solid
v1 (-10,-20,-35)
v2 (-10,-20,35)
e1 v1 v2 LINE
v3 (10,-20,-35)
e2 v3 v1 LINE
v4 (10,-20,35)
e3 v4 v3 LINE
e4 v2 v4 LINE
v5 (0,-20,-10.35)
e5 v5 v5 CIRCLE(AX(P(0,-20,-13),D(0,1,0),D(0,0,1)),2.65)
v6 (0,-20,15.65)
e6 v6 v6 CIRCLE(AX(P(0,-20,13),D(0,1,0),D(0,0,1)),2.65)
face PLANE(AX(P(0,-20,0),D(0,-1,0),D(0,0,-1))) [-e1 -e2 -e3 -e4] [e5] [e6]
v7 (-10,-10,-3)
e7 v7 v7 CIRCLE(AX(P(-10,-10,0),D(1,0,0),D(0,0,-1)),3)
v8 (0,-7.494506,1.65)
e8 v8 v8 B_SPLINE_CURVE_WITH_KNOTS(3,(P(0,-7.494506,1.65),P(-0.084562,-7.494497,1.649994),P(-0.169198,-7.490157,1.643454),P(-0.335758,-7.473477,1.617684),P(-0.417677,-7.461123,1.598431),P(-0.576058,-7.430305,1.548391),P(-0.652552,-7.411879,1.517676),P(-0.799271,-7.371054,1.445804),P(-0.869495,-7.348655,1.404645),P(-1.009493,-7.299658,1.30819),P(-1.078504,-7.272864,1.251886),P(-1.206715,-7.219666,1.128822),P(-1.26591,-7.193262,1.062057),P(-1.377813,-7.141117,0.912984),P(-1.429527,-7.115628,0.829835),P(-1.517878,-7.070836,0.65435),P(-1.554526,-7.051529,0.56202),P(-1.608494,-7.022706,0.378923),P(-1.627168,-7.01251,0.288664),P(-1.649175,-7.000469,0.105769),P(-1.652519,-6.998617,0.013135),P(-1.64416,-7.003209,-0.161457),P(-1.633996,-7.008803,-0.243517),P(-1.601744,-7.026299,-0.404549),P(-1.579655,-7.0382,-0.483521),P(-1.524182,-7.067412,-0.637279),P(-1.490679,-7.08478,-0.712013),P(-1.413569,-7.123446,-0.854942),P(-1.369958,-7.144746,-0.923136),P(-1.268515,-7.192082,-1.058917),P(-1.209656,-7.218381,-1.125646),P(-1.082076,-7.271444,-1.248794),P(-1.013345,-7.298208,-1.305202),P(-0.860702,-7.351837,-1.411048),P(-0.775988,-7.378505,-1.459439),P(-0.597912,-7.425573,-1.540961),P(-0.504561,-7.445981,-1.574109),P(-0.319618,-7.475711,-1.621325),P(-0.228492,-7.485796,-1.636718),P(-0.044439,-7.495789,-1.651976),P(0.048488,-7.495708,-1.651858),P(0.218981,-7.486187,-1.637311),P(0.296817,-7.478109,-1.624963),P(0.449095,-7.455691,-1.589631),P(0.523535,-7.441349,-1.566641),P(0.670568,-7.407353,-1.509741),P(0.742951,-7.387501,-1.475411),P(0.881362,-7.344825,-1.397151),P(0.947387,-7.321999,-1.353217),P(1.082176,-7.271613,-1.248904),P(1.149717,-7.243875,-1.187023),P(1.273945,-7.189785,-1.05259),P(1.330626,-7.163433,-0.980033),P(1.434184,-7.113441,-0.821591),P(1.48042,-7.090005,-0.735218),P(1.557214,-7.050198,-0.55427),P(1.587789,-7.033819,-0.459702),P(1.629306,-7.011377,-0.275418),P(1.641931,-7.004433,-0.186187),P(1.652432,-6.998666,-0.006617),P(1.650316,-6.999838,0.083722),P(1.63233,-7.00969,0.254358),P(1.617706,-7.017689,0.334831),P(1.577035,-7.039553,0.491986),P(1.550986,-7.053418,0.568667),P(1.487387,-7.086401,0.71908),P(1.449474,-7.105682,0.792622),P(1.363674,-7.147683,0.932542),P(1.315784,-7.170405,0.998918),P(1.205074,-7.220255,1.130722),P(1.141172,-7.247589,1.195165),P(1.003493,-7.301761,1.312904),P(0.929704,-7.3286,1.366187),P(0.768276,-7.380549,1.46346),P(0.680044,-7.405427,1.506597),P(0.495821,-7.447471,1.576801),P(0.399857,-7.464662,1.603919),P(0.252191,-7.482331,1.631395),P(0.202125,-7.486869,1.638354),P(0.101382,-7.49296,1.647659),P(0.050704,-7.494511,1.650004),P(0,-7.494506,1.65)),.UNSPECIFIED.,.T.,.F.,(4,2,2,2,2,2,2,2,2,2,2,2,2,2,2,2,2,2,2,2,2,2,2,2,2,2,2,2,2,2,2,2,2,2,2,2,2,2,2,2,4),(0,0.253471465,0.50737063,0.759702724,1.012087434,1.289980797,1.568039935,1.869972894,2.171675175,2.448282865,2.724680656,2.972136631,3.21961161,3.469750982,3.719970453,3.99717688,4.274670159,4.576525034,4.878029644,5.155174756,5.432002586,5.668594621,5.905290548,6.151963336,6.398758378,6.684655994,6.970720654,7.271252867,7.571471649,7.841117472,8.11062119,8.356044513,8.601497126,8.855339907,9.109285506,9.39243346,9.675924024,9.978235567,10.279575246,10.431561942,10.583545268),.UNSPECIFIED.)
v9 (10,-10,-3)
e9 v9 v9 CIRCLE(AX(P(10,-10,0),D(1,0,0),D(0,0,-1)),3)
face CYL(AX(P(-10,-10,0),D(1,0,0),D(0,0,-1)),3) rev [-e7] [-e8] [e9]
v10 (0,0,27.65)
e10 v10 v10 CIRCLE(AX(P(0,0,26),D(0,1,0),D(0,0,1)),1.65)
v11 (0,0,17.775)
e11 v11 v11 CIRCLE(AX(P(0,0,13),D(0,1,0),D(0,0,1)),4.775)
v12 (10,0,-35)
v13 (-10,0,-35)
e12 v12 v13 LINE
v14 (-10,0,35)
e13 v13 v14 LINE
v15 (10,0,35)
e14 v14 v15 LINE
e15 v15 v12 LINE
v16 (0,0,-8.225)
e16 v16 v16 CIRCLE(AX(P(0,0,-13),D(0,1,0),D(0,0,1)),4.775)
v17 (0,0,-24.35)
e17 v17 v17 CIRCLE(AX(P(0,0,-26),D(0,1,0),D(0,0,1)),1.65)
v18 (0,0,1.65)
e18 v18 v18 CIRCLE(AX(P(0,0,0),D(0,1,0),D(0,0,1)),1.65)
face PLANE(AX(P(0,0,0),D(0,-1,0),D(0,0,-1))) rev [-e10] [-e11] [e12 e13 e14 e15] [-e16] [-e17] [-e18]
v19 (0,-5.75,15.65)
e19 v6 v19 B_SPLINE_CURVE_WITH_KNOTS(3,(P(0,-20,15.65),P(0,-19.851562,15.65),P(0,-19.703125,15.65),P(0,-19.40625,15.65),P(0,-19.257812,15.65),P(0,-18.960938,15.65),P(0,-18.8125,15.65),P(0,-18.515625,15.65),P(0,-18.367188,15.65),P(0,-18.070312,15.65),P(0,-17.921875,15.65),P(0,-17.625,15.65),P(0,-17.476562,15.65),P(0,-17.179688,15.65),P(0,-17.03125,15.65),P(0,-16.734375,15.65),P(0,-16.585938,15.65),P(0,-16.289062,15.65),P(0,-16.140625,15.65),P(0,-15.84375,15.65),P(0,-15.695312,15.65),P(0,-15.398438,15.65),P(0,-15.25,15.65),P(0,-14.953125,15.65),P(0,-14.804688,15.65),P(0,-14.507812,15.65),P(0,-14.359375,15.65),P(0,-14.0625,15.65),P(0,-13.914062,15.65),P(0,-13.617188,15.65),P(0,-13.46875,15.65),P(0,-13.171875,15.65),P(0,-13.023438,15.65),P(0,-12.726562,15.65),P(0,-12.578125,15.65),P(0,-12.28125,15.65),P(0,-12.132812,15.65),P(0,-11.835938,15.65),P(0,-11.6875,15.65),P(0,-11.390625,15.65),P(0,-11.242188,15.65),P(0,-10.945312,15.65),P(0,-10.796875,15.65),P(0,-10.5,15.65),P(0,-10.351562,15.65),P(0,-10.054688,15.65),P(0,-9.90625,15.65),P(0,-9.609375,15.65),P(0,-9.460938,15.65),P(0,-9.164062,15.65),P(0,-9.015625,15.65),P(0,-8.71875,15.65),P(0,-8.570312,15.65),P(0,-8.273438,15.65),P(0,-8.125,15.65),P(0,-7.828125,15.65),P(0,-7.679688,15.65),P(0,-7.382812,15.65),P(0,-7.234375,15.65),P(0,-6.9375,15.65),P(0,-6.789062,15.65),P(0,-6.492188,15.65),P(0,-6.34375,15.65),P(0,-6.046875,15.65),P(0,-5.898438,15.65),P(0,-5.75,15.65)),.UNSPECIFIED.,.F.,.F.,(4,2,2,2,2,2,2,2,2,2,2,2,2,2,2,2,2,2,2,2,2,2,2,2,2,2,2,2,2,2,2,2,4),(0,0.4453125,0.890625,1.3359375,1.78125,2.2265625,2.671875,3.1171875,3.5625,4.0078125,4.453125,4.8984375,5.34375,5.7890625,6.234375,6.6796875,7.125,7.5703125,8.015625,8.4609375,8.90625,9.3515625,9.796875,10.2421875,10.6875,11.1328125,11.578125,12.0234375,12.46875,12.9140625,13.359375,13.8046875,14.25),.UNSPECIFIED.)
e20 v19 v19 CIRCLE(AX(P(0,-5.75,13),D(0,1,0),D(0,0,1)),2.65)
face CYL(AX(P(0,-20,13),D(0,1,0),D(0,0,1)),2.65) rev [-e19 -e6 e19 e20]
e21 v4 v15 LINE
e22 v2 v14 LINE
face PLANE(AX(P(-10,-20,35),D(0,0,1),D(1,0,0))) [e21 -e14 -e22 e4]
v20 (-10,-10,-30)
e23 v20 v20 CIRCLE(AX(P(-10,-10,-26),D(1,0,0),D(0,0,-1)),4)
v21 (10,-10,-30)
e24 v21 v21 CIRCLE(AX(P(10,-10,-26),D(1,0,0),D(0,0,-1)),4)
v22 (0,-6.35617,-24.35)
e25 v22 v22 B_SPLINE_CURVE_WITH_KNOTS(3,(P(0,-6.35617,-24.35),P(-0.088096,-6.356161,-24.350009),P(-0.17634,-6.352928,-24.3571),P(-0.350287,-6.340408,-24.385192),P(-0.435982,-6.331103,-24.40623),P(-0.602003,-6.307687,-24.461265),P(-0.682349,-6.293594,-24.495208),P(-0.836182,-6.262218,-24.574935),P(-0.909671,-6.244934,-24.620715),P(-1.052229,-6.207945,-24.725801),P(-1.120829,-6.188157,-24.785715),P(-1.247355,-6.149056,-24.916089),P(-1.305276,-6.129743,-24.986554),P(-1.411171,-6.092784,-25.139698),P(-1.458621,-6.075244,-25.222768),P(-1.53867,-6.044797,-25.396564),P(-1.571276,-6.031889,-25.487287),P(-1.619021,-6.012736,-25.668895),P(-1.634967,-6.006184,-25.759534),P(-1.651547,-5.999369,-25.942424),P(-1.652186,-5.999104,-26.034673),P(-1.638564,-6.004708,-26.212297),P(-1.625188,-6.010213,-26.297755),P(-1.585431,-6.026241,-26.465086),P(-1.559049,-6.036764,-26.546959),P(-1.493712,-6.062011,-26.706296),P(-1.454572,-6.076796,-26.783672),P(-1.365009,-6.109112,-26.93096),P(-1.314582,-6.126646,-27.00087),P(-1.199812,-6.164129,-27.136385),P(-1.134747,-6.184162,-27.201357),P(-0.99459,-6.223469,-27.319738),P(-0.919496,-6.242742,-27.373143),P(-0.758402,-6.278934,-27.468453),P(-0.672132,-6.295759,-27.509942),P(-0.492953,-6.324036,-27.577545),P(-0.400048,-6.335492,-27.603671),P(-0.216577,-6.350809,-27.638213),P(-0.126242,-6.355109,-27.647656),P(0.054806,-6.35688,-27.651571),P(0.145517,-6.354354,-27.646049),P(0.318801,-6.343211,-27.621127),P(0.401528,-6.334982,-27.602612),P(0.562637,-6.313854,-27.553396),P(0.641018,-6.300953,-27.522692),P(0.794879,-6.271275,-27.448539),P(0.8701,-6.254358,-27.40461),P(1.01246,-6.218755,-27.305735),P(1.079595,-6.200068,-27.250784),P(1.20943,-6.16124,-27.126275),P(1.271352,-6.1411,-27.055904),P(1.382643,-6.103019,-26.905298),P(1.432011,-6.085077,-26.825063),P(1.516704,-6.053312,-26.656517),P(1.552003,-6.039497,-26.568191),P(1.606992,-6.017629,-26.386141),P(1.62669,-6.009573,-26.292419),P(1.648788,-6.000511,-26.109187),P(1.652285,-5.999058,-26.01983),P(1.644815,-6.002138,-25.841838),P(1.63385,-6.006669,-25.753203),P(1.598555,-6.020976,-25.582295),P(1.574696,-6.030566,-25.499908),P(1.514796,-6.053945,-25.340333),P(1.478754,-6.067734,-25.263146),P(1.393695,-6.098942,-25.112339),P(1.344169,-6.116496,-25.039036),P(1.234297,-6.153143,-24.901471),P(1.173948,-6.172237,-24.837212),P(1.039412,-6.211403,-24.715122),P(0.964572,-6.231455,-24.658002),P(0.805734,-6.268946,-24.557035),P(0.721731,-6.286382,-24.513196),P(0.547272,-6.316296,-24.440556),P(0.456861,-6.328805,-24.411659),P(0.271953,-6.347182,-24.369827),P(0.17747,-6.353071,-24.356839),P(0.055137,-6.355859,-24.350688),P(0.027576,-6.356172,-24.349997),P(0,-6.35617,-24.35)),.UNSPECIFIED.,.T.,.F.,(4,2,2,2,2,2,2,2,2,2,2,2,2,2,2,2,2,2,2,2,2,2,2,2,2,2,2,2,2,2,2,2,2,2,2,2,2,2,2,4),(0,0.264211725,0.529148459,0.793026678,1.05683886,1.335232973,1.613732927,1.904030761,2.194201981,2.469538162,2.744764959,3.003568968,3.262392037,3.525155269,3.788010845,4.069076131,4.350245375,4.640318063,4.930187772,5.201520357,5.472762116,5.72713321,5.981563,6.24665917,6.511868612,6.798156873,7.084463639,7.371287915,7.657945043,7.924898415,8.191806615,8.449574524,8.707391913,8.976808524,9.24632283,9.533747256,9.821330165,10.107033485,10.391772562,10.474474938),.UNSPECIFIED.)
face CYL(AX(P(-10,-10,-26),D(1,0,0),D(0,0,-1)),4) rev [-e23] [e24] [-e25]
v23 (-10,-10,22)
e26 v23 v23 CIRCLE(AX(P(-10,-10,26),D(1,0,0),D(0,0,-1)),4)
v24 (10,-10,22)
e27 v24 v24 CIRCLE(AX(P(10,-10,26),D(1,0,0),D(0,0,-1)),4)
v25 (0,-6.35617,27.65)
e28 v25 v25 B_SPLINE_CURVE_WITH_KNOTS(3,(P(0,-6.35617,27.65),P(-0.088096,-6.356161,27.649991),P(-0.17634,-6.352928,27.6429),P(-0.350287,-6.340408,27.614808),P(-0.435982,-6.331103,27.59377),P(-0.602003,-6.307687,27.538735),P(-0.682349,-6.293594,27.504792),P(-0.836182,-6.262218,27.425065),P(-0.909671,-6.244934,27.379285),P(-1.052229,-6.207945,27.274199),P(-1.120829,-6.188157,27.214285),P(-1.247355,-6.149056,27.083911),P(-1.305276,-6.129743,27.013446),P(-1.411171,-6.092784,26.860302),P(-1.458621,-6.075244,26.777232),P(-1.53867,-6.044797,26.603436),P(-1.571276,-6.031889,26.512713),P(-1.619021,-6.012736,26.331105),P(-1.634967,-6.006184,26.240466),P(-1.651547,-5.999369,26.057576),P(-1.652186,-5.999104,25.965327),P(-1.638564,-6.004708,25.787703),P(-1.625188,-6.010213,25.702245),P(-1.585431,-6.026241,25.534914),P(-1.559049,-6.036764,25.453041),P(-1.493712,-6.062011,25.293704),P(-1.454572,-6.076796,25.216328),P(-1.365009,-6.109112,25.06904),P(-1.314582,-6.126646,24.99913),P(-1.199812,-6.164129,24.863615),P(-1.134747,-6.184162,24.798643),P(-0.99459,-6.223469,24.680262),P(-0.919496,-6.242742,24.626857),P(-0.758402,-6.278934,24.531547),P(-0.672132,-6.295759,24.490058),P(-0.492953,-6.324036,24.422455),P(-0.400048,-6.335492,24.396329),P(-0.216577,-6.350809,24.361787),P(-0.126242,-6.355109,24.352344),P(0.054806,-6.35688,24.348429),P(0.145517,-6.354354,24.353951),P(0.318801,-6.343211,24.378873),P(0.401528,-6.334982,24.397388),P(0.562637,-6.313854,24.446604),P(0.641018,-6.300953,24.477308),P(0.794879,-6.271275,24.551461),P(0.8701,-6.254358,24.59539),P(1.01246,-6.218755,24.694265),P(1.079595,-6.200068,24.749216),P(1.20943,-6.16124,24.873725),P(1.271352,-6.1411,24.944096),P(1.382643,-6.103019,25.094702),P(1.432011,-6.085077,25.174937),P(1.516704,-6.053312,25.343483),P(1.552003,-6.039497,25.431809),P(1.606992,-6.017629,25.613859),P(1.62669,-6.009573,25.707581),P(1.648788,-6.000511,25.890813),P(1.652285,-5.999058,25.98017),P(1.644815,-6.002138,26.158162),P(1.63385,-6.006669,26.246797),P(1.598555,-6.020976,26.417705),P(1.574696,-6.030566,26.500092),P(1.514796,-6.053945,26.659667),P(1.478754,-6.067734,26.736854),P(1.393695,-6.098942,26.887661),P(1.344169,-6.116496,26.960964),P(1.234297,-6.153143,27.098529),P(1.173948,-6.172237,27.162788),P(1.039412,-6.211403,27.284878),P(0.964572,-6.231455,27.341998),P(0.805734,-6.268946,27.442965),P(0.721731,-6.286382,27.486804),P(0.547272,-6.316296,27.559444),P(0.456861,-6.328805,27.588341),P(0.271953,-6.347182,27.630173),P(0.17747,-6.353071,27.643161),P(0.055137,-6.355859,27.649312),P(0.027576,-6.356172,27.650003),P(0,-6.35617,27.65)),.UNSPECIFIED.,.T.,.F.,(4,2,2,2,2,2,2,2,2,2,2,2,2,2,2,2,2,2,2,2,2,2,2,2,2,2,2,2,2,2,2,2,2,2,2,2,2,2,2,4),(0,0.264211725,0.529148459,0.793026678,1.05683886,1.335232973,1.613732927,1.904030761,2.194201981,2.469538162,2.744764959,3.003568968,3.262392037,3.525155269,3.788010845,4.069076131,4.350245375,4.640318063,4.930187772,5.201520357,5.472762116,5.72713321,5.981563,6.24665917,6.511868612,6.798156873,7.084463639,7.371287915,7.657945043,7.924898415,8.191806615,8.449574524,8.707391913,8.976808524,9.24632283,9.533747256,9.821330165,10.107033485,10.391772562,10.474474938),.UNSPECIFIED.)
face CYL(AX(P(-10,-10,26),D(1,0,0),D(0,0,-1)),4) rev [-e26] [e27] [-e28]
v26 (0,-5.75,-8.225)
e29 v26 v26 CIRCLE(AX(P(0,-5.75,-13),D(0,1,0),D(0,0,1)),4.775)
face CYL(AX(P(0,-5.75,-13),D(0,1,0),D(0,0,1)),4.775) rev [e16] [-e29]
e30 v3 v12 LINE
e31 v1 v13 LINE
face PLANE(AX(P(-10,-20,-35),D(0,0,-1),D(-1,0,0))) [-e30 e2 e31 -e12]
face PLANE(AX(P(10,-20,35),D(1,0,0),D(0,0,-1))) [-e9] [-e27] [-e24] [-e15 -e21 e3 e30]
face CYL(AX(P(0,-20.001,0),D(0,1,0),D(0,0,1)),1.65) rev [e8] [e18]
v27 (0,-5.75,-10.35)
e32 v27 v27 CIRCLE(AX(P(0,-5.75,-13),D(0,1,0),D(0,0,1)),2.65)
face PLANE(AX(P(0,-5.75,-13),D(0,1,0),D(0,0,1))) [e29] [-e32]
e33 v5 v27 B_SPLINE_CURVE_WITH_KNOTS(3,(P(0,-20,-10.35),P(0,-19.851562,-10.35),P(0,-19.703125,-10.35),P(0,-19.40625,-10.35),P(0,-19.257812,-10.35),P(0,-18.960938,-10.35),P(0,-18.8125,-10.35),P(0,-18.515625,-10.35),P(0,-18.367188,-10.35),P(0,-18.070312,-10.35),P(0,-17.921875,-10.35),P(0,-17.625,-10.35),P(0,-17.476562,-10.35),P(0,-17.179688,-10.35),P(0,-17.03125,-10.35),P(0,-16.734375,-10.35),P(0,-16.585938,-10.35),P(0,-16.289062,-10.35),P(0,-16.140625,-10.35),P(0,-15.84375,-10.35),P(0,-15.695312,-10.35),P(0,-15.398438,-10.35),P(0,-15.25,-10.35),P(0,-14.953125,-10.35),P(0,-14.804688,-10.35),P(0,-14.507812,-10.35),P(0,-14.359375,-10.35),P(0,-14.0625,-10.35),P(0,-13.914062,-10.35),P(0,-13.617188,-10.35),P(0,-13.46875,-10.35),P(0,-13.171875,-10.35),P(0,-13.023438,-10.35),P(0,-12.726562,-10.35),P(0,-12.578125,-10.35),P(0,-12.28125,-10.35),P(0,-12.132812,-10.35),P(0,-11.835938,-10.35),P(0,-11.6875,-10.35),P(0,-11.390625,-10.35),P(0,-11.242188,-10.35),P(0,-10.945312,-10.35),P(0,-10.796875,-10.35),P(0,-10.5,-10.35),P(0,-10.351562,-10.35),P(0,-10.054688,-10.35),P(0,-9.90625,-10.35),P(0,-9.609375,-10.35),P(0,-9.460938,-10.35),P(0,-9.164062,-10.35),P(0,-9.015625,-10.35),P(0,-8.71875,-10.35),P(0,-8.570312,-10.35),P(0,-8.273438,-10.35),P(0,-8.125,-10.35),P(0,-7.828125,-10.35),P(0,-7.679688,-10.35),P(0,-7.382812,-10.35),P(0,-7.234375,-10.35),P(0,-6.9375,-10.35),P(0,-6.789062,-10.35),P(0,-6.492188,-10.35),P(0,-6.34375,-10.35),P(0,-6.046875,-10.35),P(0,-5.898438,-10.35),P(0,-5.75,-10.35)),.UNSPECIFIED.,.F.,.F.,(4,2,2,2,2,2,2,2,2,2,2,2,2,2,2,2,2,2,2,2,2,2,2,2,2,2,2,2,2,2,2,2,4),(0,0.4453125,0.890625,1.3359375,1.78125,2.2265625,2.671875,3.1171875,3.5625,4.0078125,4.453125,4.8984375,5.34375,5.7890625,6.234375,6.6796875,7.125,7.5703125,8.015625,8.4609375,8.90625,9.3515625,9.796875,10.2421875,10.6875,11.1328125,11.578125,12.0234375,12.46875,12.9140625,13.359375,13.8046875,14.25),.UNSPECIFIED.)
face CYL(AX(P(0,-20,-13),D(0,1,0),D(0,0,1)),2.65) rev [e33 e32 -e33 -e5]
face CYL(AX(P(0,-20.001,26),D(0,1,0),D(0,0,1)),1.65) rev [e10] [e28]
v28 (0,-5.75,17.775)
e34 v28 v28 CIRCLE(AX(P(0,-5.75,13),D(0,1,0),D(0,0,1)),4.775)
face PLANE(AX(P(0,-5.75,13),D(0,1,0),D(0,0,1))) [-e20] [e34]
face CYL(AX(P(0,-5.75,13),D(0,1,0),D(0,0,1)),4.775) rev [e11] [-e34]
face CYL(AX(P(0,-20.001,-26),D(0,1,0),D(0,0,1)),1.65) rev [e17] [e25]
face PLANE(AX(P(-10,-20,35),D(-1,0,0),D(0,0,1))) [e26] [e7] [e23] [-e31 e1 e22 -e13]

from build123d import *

# Parameters (mm, degrees)
ESBO_O1_W             = 20
ESBO_O1_H             = 70
FLANGE_BASE1_DEPTH    = 20
ESBO_O3_R             = 4.775
CORTE_EXTRUS_O1_DEPTH = 5.75
ESBO_O4_R             = 2.65
CORTE_EXTRUS_O2_DEPTH = 40.090440008
ESBO_O5_R             = 4
ESBO_O5_R_2           = 3
CORTE_EXTRUS_O3_DEPTH = 46
CORTE_EXTRUS_O5_REACH = 43.533
ESBO_O6_R             = 1.65


# Sheet-metal steps are written as plain solids
with BuildPart() as part:
    # Esboço1 → Flange-base1 (new body)
    with BuildSketch(Plane(origin=(0, 0, 0), x_dir=(1, 0, 0), z_dir=(0, 1, 0))):
        Rectangle(ESBO_O1_W, ESBO_O1_H)
    extrude(amount=-FLANGE_BASE1_DEPTH)

    # Esboço3 → Corte-extrusão1 (cut)
    with BuildSketch(Plane(origin=(0, 0, 0), x_dir=(1, 0, 0), z_dir=(0, 1, 0))):
        with Locations(Location((0, 13, 0), (0, 0, 270))):
            Circle(ESBO_O3_R)
        with Locations(Location((0, -13, 0), (0, 0, 270))):
            Circle(ESBO_O3_R)
    extrude(amount=-CORTE_EXTRUS_O1_DEPTH, mode=Mode.SUBTRACT)

    # Esboço4 → Corte-extrusão2 (cut, through all)
    with BuildSketch(Plane(origin=(0, -5.75, 0), x_dir=(1, 0, 0), z_dir=(0, 1, 0))):
        with Locations(Location((0, 13, 0), (0, 0, 270))):
            Circle(ESBO_O4_R)
        with Locations(Location((0, -13, 0), (0, 0, 270))):
            Circle(ESBO_O4_R)
    extrude(amount=-CORTE_EXTRUS_O2_DEPTH, mode=Mode.SUBTRACT)

    # Esboço5 → Corte-extrusão3 (cut, through all)
    with BuildSketch(Plane(origin=(10, 0, 0), x_dir=(0, 0, -1), z_dir=(1, 0, 0))):
        with Locations((-26, -10)):
            Circle(ESBO_O5_R)
        with Locations((26, -10)):
            Circle(ESBO_O5_R)
        with Locations((0, -10)):
            Circle(ESBO_O5_R_2)
    extrude(amount=-CORTE_EXTRUS_O3_DEPTH, mode=Mode.SUBTRACT)

    # Esboço6 → Corte-extrusão5 (cut, up to next)
    with BuildSketch(Plane(origin=(0, 0, 0), x_dir=(1, 0, 0), z_dir=(0, 1, 0)), mode=Mode.PRIVATE) as corte_extrus_o5_sk1:
        with Locations(Location((0, -26, 0), (0, 0, 270))):
            Circle(ESBO_O6_R)
    corte_extrus_o5_tool1 = extrude(corte_extrus_o5_sk1.sketch, amount=-CORTE_EXTRUS_O5_REACH, mode=Mode.PRIVATE) & part.part
    # Esboço6 → Corte-extrusão5 (cut, up to next)
    with BuildSketch(Plane(origin=(0, 0, 0), x_dir=(1, 0, 0), z_dir=(0, 1, 0)), mode=Mode.PRIVATE) as corte_extrus_o5_sk2:
        with Locations(Location((0, 26, 0), (0, 0, 270))):
            Circle(ESBO_O6_R)
    corte_extrus_o5_tool2 = extrude(corte_extrus_o5_sk2.sketch, amount=-CORTE_EXTRUS_O5_REACH, mode=Mode.PRIVATE) & part.part
    # Esboço6 → Corte-extrusão5 (cut, up to next)
    with BuildSketch(Plane(origin=(0, 0, 0), x_dir=(1, 0, 0), z_dir=(0, 1, 0)), mode=Mode.PRIVATE) as corte_extrus_o5_sk3:
        with Locations(Location((0, 0, 0), (0, 0, 270))):
            Circle(ESBO_O6_R)
    corte_extrus_o5_tool3 = extrude(corte_extrus_o5_sk3.sketch, amount=-CORTE_EXTRUS_O5_REACH, mode=Mode.PRIVATE) & part.part
    add(corte_extrus_o5_tool1.solids().sort_by_distance((0, 0, 26))[0], mode=Mode.SUBTRACT)
    add(corte_extrus_o5_tool2.solids().sort_by_distance((0, 0, -26))[0], mode=Mode.SUBTRACT)
    add(corte_extrus_o5_tool3.solids().sort_by_distance((0, 0, 0))[0], mode=Mode.SUBTRACT)


solid = part.part
